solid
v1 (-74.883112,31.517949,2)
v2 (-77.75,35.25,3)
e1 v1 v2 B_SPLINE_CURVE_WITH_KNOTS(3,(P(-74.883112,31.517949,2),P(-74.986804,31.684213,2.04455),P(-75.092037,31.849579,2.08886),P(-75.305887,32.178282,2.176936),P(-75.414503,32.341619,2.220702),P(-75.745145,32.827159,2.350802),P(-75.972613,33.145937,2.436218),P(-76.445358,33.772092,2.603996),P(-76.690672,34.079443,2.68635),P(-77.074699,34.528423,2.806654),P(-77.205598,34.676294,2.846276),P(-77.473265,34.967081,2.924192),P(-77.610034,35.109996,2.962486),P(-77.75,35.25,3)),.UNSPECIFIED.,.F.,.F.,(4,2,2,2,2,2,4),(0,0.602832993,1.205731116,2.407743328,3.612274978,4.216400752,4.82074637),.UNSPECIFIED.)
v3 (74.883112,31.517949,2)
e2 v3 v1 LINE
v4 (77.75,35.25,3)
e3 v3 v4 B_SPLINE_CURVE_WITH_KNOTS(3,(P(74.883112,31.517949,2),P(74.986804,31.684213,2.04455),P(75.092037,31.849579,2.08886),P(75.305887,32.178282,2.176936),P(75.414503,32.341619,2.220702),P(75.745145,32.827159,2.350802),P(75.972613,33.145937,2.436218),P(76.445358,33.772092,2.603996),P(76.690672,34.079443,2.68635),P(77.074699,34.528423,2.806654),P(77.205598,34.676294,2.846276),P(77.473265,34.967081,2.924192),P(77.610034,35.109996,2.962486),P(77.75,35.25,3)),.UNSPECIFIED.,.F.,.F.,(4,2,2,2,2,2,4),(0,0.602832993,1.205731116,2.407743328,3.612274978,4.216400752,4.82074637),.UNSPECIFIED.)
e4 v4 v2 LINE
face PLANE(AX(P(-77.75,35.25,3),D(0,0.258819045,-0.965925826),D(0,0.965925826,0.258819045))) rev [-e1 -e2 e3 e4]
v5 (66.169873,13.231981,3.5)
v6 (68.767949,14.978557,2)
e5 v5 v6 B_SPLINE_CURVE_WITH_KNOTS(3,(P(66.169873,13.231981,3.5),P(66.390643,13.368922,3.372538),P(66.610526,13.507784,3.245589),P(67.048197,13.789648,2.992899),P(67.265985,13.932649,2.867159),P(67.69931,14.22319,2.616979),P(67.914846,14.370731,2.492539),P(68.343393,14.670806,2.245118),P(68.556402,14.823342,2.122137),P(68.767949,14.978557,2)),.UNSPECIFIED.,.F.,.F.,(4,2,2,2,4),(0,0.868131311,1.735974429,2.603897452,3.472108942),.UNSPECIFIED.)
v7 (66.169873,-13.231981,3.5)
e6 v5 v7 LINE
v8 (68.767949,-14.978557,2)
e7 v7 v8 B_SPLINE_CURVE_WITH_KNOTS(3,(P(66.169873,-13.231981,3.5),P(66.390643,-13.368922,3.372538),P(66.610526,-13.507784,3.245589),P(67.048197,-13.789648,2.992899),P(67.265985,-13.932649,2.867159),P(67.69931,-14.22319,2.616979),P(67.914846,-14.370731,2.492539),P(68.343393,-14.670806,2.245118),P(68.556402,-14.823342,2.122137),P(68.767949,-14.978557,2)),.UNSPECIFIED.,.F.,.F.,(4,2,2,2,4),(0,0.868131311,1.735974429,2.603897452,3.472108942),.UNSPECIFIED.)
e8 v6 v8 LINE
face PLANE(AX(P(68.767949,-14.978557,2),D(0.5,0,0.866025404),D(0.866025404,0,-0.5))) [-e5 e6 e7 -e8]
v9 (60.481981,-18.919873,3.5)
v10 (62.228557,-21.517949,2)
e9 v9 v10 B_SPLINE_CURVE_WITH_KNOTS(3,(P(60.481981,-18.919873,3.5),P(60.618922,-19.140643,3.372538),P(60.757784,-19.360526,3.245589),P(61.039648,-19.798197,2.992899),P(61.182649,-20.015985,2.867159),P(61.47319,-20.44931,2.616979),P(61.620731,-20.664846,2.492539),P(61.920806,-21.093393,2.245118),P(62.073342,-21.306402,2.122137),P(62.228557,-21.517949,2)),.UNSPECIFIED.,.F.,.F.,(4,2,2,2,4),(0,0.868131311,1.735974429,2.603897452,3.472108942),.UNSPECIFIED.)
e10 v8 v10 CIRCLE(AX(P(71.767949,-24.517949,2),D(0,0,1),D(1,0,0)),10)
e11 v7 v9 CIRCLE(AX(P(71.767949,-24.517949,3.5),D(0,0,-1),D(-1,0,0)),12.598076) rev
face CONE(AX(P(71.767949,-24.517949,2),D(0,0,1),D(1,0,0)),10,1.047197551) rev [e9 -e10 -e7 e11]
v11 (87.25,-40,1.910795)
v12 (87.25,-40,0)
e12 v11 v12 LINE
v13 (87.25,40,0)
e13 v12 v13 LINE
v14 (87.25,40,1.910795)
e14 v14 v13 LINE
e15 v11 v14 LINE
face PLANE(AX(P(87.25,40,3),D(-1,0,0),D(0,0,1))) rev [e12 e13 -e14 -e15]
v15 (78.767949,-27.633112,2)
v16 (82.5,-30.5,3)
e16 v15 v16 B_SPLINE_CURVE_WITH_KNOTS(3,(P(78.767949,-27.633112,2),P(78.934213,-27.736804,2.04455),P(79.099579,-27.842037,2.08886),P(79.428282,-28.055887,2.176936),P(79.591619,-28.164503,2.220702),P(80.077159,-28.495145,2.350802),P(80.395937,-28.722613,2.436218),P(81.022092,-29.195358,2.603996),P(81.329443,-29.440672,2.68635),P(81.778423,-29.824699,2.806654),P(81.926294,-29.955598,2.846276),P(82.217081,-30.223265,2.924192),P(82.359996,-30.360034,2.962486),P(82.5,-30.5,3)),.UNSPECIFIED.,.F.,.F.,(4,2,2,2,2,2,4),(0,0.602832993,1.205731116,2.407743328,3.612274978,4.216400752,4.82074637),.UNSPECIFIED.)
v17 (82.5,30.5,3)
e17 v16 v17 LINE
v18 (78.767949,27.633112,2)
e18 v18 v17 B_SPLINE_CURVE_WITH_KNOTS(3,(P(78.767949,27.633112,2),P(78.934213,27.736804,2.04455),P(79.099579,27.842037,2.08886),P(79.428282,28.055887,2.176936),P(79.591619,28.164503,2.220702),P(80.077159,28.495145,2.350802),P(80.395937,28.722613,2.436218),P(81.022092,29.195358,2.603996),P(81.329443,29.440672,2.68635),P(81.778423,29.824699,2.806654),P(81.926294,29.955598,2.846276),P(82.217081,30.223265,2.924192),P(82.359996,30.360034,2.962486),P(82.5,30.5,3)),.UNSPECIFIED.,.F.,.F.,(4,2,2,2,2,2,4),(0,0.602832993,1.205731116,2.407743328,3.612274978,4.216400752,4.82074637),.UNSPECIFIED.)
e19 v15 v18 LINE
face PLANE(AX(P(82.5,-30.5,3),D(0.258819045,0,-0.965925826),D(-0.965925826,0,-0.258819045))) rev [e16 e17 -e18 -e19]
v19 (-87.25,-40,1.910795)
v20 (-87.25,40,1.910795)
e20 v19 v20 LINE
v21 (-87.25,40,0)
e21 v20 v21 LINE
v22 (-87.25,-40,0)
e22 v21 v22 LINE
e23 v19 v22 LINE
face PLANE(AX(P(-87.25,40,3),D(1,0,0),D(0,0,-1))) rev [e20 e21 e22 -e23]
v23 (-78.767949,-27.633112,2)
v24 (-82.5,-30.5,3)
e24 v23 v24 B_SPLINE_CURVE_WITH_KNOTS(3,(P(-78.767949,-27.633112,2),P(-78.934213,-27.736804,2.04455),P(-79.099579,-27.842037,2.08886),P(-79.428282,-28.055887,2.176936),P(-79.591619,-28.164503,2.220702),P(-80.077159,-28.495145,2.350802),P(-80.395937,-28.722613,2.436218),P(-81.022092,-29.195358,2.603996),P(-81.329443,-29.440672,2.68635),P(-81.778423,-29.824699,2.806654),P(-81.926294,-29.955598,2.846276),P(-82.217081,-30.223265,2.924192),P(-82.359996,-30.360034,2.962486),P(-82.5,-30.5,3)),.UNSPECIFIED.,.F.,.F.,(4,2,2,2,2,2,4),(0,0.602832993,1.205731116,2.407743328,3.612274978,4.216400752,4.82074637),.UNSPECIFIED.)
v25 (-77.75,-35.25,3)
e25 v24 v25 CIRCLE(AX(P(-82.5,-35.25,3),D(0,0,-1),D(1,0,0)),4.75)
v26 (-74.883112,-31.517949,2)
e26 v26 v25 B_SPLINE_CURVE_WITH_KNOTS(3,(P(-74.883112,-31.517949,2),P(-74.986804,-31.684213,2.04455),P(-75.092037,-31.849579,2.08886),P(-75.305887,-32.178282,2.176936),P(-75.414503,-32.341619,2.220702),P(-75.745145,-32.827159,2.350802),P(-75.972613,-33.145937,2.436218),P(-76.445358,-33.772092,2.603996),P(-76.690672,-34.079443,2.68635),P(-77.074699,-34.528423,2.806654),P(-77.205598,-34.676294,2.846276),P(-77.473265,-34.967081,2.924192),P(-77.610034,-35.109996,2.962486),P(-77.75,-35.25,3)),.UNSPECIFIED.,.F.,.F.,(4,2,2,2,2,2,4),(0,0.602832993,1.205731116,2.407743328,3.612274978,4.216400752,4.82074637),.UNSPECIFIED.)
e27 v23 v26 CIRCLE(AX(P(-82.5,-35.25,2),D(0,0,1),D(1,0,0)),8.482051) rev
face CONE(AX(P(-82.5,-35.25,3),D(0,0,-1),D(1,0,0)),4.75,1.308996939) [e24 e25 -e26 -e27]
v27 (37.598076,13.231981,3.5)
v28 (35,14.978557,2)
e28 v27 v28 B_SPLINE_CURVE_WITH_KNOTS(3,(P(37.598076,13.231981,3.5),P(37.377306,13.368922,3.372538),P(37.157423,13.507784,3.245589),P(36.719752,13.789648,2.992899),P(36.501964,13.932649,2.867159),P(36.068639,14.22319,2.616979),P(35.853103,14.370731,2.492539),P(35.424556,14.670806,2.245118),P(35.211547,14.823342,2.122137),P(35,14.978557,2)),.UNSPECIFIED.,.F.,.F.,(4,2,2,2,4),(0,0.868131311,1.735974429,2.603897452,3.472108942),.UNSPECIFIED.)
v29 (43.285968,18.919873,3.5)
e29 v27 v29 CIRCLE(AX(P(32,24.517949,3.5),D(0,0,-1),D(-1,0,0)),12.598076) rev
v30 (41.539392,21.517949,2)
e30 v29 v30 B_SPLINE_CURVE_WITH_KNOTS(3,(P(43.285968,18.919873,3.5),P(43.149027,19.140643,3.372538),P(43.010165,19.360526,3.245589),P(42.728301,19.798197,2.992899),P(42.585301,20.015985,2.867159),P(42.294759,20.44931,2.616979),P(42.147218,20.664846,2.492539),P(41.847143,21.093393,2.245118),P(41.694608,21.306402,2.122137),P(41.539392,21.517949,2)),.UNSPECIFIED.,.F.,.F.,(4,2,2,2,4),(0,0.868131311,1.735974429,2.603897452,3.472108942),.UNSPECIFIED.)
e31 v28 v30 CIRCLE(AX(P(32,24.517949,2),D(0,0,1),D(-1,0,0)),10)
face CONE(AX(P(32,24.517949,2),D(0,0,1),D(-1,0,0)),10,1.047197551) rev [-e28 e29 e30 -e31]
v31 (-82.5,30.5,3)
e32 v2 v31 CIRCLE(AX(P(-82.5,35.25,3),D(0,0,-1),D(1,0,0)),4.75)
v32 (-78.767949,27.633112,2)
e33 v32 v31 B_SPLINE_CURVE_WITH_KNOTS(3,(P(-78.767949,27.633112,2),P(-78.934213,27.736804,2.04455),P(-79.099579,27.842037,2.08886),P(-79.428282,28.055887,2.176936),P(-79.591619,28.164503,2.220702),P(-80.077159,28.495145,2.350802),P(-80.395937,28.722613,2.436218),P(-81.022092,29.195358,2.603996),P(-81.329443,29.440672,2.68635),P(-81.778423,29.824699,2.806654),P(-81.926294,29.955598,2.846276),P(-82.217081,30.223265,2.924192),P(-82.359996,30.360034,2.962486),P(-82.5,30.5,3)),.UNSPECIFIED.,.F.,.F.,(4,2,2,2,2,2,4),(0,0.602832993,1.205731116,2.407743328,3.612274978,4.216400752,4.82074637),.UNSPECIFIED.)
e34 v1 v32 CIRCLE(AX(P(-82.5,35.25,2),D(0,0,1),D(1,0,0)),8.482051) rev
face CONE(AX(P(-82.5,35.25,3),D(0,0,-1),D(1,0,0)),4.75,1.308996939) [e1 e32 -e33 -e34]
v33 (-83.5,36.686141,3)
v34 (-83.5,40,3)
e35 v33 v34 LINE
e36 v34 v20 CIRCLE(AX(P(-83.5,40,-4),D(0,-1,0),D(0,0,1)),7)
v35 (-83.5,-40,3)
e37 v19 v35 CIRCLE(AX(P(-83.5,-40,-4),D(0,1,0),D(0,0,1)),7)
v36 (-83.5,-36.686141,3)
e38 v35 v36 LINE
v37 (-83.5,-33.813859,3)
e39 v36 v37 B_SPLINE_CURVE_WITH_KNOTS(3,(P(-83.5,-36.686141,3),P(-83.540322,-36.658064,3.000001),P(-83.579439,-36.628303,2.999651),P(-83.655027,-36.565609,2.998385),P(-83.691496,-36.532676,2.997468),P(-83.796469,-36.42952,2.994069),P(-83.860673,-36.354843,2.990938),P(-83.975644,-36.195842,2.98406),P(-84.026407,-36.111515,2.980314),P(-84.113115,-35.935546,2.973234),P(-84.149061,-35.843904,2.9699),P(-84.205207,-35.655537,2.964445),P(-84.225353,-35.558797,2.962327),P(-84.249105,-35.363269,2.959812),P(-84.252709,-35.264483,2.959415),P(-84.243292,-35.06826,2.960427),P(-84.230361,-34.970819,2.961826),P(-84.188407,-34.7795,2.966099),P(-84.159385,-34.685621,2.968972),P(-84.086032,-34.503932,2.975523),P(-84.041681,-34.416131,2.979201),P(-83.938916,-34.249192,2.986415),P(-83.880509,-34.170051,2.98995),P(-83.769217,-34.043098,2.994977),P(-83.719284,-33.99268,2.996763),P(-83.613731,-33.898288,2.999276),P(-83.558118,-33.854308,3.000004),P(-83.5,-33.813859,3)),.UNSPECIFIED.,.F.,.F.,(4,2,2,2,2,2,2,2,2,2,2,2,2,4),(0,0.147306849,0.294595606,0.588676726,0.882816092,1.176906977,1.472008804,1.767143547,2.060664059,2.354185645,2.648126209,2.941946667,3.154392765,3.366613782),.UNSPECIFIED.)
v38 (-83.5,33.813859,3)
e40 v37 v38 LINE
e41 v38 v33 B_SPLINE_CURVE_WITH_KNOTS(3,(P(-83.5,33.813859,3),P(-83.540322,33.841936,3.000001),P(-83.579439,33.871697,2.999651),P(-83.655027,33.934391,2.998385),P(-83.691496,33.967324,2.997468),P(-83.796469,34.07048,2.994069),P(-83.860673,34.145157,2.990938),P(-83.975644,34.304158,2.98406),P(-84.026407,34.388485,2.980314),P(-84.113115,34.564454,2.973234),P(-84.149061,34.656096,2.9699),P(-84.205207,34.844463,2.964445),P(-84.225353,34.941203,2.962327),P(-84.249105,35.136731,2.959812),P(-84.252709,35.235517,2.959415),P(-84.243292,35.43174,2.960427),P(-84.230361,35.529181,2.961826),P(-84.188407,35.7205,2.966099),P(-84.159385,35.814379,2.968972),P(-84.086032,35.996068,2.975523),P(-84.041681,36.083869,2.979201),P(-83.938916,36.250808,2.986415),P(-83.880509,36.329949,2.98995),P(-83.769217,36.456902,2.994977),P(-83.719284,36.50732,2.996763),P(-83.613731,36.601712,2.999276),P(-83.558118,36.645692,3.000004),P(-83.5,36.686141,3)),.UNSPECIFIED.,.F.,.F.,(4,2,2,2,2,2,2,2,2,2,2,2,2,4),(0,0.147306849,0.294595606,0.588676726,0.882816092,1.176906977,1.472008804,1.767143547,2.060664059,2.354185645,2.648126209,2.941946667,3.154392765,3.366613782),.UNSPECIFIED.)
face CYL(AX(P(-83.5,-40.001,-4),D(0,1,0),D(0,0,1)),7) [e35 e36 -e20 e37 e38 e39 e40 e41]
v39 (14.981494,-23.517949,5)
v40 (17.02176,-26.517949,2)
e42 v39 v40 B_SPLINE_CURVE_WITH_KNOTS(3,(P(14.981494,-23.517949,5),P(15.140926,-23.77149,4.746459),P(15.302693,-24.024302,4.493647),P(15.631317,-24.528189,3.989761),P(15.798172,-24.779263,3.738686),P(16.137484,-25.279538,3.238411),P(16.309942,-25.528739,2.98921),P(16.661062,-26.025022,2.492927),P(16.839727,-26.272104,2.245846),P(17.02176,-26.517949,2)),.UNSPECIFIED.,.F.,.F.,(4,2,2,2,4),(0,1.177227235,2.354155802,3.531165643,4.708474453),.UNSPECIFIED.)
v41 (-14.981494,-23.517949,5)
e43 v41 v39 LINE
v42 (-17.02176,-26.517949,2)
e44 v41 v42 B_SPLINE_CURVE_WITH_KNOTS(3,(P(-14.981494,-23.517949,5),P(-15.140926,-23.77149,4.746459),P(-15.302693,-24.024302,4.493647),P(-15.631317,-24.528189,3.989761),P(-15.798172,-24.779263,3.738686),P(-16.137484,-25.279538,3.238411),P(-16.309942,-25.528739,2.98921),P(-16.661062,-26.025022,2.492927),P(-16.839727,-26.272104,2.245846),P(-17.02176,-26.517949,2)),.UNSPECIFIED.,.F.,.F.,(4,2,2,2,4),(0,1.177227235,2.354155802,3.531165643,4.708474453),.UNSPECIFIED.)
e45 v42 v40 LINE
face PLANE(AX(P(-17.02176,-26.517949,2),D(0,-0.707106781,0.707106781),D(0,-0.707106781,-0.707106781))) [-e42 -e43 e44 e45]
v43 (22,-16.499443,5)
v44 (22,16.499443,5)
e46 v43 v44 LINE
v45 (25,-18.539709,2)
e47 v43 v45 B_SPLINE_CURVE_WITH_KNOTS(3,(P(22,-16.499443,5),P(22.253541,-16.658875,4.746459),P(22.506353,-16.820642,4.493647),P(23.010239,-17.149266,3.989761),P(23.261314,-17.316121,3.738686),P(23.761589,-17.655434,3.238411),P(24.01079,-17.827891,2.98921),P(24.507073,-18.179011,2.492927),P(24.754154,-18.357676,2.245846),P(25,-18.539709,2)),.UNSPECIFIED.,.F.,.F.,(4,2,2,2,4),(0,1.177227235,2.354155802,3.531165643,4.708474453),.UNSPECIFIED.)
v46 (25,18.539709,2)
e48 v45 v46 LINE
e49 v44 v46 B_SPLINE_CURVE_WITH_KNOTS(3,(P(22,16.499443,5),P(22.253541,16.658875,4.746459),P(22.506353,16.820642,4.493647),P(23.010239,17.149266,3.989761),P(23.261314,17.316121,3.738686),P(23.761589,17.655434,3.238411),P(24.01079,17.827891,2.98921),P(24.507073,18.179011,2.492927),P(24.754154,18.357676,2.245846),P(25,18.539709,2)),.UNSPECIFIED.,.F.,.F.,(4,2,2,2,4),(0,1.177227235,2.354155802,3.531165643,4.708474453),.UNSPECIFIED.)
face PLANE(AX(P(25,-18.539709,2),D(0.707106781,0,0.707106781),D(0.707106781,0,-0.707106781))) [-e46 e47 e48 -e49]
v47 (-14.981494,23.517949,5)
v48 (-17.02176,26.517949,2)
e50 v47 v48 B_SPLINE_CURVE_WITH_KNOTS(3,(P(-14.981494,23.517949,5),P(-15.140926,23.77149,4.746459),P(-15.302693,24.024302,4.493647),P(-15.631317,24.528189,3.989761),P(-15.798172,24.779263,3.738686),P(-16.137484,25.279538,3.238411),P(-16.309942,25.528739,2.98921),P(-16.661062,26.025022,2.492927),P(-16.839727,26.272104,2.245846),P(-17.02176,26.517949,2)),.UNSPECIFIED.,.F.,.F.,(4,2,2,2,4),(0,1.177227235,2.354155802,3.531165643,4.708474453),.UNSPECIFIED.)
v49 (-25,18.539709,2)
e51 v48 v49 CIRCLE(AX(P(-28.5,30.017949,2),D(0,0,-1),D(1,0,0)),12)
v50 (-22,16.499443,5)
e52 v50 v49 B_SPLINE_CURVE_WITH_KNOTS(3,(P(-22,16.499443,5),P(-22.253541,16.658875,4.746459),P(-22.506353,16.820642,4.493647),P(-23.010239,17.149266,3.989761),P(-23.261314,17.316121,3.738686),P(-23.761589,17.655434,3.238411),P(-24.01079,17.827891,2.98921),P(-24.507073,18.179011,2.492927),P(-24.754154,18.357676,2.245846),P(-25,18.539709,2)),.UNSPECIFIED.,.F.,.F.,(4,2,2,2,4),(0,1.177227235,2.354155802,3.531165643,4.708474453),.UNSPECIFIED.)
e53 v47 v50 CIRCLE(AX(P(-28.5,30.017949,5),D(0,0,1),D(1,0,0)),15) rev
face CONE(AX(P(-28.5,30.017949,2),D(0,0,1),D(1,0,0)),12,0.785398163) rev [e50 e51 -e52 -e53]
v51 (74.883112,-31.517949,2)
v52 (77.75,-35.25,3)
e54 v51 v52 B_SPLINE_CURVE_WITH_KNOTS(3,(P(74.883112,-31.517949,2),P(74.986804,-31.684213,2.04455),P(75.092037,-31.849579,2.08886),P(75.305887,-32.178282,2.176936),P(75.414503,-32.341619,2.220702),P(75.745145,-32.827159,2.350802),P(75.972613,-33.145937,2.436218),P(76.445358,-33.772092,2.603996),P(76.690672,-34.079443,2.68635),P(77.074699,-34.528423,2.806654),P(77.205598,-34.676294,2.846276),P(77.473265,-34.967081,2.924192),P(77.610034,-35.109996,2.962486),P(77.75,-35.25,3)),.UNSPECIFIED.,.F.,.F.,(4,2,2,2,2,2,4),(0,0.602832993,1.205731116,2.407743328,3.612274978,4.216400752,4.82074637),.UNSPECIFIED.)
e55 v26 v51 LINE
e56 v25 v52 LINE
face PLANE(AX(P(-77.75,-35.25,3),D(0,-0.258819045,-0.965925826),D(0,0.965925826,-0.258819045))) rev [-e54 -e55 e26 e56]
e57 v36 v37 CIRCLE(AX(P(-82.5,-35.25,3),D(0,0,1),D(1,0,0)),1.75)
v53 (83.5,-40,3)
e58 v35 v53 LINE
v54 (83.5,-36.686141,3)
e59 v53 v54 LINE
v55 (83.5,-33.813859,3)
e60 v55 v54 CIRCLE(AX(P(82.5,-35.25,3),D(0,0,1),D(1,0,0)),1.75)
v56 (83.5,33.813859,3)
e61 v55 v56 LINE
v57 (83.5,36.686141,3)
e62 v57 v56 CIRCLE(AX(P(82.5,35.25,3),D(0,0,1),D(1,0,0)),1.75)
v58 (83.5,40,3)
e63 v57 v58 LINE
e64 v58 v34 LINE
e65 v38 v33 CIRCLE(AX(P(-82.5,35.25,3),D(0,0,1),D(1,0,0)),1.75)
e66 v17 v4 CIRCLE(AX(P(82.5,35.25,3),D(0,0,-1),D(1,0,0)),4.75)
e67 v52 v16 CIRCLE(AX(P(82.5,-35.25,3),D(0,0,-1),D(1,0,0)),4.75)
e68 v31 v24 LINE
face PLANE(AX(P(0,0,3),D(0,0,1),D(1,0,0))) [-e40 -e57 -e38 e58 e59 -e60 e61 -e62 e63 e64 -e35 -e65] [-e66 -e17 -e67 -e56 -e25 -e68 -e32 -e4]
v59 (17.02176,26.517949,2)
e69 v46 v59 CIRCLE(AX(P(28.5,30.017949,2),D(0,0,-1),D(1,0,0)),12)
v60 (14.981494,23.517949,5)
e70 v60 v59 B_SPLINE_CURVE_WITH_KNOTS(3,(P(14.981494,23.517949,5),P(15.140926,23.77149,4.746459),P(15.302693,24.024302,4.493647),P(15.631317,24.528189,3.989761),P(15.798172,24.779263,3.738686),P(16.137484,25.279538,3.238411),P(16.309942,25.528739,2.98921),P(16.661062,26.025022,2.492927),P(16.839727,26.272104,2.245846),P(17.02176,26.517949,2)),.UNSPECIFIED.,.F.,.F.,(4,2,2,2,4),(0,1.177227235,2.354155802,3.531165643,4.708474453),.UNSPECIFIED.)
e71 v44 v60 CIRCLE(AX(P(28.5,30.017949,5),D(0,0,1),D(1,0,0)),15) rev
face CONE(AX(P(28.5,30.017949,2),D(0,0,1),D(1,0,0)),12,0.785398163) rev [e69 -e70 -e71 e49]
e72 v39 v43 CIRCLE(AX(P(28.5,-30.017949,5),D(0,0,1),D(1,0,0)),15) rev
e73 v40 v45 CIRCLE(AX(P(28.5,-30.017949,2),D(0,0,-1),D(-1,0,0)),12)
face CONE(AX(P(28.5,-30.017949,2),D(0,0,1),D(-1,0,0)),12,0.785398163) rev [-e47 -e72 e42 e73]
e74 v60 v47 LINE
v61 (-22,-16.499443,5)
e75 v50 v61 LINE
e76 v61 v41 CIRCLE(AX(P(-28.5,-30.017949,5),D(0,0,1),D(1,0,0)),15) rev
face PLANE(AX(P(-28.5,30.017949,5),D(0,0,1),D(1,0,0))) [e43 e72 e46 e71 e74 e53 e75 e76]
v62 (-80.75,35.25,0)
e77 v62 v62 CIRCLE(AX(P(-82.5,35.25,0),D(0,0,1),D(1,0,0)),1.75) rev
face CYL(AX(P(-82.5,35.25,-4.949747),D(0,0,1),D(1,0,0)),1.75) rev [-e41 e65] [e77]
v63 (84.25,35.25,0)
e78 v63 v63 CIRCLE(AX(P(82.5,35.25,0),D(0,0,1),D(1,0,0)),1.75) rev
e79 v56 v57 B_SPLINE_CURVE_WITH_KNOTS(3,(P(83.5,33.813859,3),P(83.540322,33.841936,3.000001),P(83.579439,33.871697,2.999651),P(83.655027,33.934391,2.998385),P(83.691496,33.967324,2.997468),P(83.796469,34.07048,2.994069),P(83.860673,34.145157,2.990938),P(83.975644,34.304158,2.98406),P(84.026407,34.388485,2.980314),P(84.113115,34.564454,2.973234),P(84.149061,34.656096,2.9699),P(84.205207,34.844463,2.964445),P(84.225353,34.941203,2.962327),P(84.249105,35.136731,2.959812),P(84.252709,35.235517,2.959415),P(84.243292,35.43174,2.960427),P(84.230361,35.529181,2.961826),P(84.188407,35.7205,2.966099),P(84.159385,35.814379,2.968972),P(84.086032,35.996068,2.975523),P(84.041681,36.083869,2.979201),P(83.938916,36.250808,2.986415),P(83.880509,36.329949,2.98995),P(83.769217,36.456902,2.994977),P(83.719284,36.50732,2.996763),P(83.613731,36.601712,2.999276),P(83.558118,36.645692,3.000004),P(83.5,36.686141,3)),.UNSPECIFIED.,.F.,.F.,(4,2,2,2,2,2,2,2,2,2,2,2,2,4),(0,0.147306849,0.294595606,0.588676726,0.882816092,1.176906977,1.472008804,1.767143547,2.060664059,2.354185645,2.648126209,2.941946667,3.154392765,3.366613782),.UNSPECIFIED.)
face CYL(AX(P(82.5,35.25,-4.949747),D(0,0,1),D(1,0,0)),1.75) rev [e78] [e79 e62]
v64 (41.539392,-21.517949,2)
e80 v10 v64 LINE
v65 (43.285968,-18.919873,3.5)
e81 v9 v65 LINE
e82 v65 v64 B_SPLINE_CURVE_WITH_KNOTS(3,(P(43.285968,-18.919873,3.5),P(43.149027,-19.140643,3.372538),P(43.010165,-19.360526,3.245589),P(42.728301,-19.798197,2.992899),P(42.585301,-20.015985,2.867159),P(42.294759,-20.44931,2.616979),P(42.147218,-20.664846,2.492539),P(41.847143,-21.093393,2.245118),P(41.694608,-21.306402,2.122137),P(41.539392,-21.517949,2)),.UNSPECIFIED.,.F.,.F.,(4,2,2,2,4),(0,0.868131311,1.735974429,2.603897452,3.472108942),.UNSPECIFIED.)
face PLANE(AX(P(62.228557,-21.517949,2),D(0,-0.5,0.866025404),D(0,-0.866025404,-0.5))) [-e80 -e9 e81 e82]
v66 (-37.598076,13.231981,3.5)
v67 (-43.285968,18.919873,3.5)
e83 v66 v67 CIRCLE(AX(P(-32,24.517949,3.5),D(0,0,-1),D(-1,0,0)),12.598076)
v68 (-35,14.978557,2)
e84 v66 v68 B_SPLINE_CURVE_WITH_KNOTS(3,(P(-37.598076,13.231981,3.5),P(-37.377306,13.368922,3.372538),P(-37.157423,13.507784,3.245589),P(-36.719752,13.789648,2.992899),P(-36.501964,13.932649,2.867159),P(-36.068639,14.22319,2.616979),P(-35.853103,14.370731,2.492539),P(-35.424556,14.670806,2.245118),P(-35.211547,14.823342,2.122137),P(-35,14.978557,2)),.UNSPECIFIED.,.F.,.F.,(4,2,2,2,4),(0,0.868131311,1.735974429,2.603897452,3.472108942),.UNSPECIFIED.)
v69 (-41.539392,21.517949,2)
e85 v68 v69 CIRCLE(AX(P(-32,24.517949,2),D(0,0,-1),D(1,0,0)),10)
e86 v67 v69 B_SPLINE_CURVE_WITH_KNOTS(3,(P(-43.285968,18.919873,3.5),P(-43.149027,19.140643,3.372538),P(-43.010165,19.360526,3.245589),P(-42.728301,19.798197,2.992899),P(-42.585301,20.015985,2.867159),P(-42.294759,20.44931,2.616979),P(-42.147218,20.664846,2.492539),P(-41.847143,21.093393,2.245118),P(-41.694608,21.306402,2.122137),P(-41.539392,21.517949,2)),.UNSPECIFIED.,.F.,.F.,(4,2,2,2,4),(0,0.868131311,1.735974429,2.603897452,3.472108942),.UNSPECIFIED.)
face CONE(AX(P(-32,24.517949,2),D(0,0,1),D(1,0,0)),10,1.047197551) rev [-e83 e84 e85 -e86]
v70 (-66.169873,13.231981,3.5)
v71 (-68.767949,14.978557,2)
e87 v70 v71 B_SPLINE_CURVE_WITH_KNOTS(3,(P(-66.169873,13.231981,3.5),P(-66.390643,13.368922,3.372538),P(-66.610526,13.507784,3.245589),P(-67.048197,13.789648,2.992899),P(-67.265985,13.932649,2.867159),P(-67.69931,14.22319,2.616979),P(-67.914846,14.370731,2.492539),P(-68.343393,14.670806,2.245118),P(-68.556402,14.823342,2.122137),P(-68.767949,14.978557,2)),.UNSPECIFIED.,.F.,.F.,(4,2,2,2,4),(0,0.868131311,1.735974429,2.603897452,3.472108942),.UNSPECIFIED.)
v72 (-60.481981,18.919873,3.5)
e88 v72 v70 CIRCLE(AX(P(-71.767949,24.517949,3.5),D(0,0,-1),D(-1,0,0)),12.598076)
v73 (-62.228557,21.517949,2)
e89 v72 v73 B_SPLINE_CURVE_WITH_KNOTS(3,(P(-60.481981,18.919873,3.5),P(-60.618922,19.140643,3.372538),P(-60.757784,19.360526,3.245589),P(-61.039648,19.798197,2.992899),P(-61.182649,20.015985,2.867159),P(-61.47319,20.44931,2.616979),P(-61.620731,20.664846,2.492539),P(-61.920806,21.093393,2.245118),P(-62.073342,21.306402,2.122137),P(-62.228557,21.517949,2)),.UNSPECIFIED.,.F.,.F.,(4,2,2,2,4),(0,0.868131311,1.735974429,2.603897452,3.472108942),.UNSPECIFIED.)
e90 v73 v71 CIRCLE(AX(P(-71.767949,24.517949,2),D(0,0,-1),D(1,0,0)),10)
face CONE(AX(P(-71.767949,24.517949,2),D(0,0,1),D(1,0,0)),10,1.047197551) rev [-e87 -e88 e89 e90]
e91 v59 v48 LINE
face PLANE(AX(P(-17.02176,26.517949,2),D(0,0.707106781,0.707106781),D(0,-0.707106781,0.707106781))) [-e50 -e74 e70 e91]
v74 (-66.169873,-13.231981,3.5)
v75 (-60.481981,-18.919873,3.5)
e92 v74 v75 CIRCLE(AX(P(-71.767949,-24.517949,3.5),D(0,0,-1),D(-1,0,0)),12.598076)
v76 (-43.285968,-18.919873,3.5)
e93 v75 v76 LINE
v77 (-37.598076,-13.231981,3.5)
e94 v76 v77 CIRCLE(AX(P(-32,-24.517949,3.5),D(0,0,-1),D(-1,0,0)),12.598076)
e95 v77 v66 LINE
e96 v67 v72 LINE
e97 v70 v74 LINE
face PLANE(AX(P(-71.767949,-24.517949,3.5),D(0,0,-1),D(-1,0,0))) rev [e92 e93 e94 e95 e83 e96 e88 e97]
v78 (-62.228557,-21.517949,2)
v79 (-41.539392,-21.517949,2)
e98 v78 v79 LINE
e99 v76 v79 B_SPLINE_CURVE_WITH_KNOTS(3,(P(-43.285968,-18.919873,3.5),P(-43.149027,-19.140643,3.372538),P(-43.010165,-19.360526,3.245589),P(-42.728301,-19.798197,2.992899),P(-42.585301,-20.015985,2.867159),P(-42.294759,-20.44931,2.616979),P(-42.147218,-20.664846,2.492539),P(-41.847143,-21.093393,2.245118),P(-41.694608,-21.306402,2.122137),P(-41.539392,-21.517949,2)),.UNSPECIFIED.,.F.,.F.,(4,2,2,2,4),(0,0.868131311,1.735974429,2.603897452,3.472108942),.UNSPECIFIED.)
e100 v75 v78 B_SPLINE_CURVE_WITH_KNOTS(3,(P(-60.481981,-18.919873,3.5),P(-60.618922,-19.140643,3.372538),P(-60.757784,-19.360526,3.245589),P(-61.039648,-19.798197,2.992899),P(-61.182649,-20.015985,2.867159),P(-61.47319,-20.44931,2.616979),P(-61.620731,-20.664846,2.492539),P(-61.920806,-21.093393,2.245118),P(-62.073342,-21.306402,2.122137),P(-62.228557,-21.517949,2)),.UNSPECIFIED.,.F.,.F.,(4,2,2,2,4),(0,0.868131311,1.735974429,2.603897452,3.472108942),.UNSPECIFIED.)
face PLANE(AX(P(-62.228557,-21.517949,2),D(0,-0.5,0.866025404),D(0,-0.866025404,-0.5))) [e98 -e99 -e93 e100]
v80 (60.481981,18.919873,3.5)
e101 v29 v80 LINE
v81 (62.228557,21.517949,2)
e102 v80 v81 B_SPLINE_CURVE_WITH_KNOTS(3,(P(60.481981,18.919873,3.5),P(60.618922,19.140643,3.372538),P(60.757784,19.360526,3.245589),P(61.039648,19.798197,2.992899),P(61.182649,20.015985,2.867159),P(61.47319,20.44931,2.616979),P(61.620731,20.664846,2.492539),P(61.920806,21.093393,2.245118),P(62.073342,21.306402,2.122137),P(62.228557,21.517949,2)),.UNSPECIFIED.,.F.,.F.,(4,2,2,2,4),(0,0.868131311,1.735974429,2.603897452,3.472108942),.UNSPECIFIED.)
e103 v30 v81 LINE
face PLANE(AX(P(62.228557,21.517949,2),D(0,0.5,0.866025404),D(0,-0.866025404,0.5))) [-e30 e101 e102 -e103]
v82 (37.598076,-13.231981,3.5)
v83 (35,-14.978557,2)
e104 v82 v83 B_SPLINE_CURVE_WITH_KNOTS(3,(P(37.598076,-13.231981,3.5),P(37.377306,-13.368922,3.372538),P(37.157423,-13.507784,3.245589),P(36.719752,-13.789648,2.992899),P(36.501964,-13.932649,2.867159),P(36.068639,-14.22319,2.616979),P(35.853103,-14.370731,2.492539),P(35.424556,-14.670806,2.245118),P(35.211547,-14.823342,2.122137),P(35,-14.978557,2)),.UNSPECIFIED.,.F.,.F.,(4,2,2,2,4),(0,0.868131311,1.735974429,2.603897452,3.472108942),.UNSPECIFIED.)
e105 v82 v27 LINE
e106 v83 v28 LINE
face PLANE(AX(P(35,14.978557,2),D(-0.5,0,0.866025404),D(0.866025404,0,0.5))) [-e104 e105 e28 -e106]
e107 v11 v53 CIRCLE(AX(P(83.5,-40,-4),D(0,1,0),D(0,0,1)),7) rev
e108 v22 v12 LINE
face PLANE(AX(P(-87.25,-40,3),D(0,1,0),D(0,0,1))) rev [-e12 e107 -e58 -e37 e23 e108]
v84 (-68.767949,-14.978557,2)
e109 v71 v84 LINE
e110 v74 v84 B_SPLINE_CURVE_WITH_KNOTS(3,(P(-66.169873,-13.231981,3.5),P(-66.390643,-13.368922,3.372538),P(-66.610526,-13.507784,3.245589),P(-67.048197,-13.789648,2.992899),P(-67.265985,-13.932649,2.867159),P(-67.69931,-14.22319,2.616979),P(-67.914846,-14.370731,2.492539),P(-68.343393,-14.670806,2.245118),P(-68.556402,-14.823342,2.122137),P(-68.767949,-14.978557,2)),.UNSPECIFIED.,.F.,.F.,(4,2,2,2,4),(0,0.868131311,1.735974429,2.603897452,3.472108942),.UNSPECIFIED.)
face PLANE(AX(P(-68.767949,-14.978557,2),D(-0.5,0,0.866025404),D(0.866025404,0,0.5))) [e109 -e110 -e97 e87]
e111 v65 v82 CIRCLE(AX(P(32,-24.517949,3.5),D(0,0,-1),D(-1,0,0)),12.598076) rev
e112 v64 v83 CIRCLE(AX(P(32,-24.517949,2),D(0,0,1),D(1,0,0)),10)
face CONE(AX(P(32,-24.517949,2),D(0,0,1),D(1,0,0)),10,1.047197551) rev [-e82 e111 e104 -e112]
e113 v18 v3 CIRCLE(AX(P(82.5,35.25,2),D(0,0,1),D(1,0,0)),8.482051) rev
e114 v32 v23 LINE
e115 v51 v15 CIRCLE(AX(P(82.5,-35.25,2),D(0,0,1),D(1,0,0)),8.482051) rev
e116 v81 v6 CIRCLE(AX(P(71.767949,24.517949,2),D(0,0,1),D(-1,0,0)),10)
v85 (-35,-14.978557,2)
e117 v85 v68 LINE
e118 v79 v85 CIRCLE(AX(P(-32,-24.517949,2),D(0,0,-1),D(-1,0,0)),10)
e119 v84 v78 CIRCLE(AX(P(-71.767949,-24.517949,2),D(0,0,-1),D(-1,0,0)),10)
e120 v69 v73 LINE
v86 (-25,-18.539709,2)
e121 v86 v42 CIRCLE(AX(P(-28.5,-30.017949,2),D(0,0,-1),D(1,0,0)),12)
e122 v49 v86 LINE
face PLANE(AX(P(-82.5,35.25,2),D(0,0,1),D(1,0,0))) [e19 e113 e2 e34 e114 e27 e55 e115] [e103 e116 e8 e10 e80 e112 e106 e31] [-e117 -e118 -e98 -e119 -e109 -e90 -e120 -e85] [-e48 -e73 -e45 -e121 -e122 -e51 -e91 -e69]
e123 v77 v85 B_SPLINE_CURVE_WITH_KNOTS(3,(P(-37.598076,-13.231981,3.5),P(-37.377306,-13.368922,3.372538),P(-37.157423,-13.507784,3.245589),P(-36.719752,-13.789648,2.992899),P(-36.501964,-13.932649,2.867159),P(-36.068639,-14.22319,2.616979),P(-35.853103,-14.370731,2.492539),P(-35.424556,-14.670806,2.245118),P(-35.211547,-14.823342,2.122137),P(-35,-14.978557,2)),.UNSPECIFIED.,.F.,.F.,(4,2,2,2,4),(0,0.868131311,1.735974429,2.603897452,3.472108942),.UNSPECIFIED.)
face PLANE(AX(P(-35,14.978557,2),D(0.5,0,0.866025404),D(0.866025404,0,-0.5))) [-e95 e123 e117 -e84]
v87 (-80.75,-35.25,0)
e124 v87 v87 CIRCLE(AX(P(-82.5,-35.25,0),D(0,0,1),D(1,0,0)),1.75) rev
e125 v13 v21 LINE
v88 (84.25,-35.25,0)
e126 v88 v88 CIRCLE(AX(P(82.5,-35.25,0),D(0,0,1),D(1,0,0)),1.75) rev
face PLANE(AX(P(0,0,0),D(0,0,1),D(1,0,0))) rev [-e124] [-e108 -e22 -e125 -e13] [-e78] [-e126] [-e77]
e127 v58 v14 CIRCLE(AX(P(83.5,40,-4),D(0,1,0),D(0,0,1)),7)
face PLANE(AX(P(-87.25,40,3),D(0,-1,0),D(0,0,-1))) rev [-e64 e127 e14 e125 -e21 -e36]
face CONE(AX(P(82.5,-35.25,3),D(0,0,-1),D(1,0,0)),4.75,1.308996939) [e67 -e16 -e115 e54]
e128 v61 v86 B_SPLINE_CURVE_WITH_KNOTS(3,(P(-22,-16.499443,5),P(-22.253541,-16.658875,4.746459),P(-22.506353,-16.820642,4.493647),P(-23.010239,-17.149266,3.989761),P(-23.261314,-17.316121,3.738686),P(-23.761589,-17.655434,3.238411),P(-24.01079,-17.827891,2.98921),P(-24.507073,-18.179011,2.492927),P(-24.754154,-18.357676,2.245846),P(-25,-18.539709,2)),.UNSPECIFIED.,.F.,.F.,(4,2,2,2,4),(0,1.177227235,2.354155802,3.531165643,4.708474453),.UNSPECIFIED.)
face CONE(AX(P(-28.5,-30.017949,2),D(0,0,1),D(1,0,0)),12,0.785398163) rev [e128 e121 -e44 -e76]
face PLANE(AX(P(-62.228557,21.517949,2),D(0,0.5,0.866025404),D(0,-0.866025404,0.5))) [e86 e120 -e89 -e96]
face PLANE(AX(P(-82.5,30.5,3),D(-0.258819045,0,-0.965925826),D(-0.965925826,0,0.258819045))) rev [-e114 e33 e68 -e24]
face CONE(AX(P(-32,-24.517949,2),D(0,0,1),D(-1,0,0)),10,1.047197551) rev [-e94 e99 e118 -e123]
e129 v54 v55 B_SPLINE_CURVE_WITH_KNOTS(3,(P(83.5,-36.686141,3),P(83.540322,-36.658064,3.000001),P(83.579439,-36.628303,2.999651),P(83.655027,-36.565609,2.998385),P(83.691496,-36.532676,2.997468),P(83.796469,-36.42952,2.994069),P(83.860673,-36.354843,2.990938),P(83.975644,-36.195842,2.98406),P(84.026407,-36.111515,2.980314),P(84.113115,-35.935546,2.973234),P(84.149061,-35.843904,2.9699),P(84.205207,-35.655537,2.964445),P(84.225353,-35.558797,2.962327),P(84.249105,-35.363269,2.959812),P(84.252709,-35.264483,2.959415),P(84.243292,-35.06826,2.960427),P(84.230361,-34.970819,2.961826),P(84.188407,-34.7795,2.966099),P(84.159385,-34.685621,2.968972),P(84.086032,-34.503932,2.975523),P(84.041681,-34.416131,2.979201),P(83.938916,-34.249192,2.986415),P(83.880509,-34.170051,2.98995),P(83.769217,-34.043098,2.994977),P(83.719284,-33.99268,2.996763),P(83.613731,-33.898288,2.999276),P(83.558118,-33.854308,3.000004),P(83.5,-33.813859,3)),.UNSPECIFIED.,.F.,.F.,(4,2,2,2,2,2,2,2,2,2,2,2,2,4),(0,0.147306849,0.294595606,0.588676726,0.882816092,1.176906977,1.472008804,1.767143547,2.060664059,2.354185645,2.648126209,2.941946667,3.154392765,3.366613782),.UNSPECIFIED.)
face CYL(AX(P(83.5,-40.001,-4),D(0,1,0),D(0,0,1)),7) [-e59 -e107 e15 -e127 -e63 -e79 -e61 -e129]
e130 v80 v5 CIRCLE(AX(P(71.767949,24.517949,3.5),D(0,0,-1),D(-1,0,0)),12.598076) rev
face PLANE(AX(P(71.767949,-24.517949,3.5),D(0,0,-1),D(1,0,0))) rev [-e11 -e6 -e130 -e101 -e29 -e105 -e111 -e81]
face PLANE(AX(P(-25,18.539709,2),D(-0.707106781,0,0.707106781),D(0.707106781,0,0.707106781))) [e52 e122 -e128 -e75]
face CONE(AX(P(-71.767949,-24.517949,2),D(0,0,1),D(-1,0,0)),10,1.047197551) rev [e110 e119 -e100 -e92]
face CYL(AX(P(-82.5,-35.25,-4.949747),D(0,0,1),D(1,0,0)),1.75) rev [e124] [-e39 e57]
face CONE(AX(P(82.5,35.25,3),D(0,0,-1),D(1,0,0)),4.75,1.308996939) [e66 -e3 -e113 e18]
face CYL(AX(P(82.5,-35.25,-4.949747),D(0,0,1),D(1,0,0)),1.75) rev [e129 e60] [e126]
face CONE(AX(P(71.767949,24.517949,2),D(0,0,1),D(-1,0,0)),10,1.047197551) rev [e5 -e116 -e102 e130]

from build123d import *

# Parameters (mm, degrees)
SKETCH2_W           = 174.5
SKETCH2_H           = 80
BOSS_EXTRUDE1_DEPTH = 3
SKETCH3_R           = 1.75
CUT_EXTRUDE1_DEPTH  = 3
CUT_EXTRUDE2_DEPTH  = 1
CUT_EXTRUDE2_DRAFT  = -75
CUT_EXTRUDE3_REACH  = 120.413
BOSS_EXTRUDE2_DEPTH = 3
BOSS_EXTRUDE2_TAPER = 45
BOSS_EXTRUDE3_DEPTH = 1.5
BOSS_EXTRUDE3_TAPER = 60


# Read off the part's stored shape, not the designer's step: Cut-Extrude2
with BuildPart() as part:
    # Sketch2 → Boss-Extrude1 (new body)
    with BuildSketch(Plane.XY):
        Rectangle(SKETCH2_W, SKETCH2_H)
    extrude(amount=BOSS_EXTRUDE1_DEPTH)

    # Sketch3 → Cut-Extrude1 (cut)
    with BuildSketch(Plane.XY.offset(3)):
        with Locations((-82.5, 35.25)):
            Circle(SKETCH3_R)
        with Locations((82.5, 35.25)):
            Circle(SKETCH3_R)
        with Locations((82.5, -35.25)):
            Circle(SKETCH3_R)
        with Locations((-82.5, -35.25)):
            Circle(SKETCH3_R)
    extrude(amount=-CUT_EXTRUDE1_DEPTH, mode=Mode.SUBTRACT)


with BuildPart() as cut_extrude2_tool:
    # Cut-Extrude2 outline → Cut-Extrude2 (with draft: the straight prism first)
    with BuildSketch(Plane.XY.offset(2)):
        with BuildLine():
            ThreePointArc((-74.883112009, 31.517949192), (-76.502284356, 29.252284356), (-78.767949192, 27.633112009))
            Line((-78.767949192, 27.633112009), (-78.767949192, -27.633112009))
            ThreePointArc((-78.767949192, -27.633112009), (-76.502284356, -29.252284356), (-74.883112009, -31.517949192))
            Line((-74.883112009, -31.517949192), (74.883112009, -31.517949192))
            ThreePointArc((74.883112009, -31.517949192), (76.502284356, -29.252284356), (78.767949192, -27.633112009))
            Line((78.767949192, -27.633112009), (78.767949192, 27.633112009))
            ThreePointArc((78.767949192, 27.633112009), (76.502284356, 29.252284356), (74.883112009, 31.517949192))
            Line((74.883112009, 31.517949192), (-74.883112009, 31.517949192))
        make_face()
    extrude(amount=CUT_EXTRUDE2_DEPTH)
    # Cut-Extrude2: the draft: its side faces are tilted about the plane it starts from
    cut_extrude2_sides = [cut_extrude2_tool.faces().sort_by_distance(p)[0] for p in [
        (-76.502284356, 29.252284356, 2.5),
        (-78.767949192, 0, 2.5),
        (-76.502284356, -29.252284356, 2.5),
        (0, -31.517949192, 2.5),
        (76.502284356, -29.252284356, 2.5),
        (78.767949192, 0, 2.5),
        (76.502284356, 29.252284356, 2.5),
        (0, 31.517949192, 2.5),
    ]]
    draft(cut_extrude2_sides, Plane.XY.offset(2), CUT_EXTRUDE2_DRAFT)


with BuildPart() as part_1:
    add(part.part)

    # Cut-Extrude2: cut by cut_extrude2_tool
    add(cut_extrude2_tool.part, mode=Mode.SUBTRACT)

    # Sketch5 → Cut-Extrude3 (cut, up to next)
    with BuildSketch(Plane(origin=(0, 40, 0), x_dir=(1, 0, 0), z_dir=(0, 1, 0)), mode=Mode.PRIVATE) as cut_extrude3_sk1:
        with BuildLine():
            Line((-87.25, -1.910795209), (-87.25, -3))
            Line((-87.25, -3), (-83.5, -3))
            ThreePointArc((-83.5, -3), (-85.45248989, -2.722185897), (-87.25, -1.910795209))
        make_face()
    cut_extrude3_tool1 = extrude(cut_extrude3_sk1.sketch, amount=-CUT_EXTRUDE3_REACH, mode=Mode.PRIVATE) & part_1.part
    cut_extrude3 = cut_extrude3_tool1.solids().sort_by_distance((-86.327713, 40, 2.678112))[0]
    add(cut_extrude3, mode=Mode.SUBTRACT)

    # Mirror1: Cut-Extrude3 across plane
    add(cut_extrude3.mirror(Plane(origin=(0, 0, 0), x_dir=(0, 0, 1), z_dir=(1, 0, 0))), mode=Mode.SUBTRACT)

    # Sketch6 → Boss-Extrude2 (add)
    with BuildSketch(Plane.XY.offset(2)):
        with BuildLine():
            Line((-25, 18.539708909), (-25, -18.539708909))
            ThreePointArc((-25, -18.539708909), (-20.014718626, -21.532667818), (-17.021759717, -26.517949192))
            Line((-17.021759717, -26.517949192), (17.021759717, -26.517949192))
            ThreePointArc((17.021759717, -26.517949192), (20.014718626, -21.532667818), (25, -18.539708909))
            Line((25, -18.539708909), (25, 18.539708909))
            ThreePointArc((25, 18.539708909), (20.014718626, 21.532667818), (17.021759717, 26.517949192))
            Line((17.021759717, 26.517949192), (-17.021759717, 26.517949192))
            ThreePointArc((-17.021759717, 26.517949192), (-20.014718626, 21.532667818), (-25, 18.539708909))
        make_face()
    extrude(amount=BOSS_EXTRUDE2_DEPTH, taper=BOSS_EXTRUDE2_TAPER)

    # Sketch7 → Boss-Extrude3 (add)
    with BuildSketch(Plane.XY.offset(2)):
        with BuildLine():
            ThreePointArc((-68.767949192, -14.978557178), (-64.696881381, -17.446881381), (-62.228557178, -21.517949192))
            Line((-62.228557178, -21.517949192), (-41.539392014, -21.517949192))
            ThreePointArc((-41.539392014, -21.517949192), (-39.071067812, -17.446881381), (-35, -14.978557178))
            Line((-35, -14.978557178), (-35, 14.978557178))
            ThreePointArc((-35, 14.978557178), (-39.071067812, 17.446881381), (-41.539392014, 21.517949192))
            Line((-41.539392014, 21.517949192), (-62.228557178, 21.517949192))
            ThreePointArc((-62.228557178, 21.517949192), (-64.696881381, 17.446881381), (-68.767949192, 14.978557178))
            Line((-68.767949192, 14.978557178), (-68.767949192, -14.978557178))
        make_face()
    boss_extrude3 = extrude(amount=BOSS_EXTRUDE3_DEPTH, taper=BOSS_EXTRUDE3_TAPER)

    # Mirror2: Boss-Extrude3 across plane
    add(boss_extrude3.mirror(Plane(origin=(0, 0, 0), x_dir=(0, 0, 1), z_dir=(1, 0, 0))))


solid = part_1.part
